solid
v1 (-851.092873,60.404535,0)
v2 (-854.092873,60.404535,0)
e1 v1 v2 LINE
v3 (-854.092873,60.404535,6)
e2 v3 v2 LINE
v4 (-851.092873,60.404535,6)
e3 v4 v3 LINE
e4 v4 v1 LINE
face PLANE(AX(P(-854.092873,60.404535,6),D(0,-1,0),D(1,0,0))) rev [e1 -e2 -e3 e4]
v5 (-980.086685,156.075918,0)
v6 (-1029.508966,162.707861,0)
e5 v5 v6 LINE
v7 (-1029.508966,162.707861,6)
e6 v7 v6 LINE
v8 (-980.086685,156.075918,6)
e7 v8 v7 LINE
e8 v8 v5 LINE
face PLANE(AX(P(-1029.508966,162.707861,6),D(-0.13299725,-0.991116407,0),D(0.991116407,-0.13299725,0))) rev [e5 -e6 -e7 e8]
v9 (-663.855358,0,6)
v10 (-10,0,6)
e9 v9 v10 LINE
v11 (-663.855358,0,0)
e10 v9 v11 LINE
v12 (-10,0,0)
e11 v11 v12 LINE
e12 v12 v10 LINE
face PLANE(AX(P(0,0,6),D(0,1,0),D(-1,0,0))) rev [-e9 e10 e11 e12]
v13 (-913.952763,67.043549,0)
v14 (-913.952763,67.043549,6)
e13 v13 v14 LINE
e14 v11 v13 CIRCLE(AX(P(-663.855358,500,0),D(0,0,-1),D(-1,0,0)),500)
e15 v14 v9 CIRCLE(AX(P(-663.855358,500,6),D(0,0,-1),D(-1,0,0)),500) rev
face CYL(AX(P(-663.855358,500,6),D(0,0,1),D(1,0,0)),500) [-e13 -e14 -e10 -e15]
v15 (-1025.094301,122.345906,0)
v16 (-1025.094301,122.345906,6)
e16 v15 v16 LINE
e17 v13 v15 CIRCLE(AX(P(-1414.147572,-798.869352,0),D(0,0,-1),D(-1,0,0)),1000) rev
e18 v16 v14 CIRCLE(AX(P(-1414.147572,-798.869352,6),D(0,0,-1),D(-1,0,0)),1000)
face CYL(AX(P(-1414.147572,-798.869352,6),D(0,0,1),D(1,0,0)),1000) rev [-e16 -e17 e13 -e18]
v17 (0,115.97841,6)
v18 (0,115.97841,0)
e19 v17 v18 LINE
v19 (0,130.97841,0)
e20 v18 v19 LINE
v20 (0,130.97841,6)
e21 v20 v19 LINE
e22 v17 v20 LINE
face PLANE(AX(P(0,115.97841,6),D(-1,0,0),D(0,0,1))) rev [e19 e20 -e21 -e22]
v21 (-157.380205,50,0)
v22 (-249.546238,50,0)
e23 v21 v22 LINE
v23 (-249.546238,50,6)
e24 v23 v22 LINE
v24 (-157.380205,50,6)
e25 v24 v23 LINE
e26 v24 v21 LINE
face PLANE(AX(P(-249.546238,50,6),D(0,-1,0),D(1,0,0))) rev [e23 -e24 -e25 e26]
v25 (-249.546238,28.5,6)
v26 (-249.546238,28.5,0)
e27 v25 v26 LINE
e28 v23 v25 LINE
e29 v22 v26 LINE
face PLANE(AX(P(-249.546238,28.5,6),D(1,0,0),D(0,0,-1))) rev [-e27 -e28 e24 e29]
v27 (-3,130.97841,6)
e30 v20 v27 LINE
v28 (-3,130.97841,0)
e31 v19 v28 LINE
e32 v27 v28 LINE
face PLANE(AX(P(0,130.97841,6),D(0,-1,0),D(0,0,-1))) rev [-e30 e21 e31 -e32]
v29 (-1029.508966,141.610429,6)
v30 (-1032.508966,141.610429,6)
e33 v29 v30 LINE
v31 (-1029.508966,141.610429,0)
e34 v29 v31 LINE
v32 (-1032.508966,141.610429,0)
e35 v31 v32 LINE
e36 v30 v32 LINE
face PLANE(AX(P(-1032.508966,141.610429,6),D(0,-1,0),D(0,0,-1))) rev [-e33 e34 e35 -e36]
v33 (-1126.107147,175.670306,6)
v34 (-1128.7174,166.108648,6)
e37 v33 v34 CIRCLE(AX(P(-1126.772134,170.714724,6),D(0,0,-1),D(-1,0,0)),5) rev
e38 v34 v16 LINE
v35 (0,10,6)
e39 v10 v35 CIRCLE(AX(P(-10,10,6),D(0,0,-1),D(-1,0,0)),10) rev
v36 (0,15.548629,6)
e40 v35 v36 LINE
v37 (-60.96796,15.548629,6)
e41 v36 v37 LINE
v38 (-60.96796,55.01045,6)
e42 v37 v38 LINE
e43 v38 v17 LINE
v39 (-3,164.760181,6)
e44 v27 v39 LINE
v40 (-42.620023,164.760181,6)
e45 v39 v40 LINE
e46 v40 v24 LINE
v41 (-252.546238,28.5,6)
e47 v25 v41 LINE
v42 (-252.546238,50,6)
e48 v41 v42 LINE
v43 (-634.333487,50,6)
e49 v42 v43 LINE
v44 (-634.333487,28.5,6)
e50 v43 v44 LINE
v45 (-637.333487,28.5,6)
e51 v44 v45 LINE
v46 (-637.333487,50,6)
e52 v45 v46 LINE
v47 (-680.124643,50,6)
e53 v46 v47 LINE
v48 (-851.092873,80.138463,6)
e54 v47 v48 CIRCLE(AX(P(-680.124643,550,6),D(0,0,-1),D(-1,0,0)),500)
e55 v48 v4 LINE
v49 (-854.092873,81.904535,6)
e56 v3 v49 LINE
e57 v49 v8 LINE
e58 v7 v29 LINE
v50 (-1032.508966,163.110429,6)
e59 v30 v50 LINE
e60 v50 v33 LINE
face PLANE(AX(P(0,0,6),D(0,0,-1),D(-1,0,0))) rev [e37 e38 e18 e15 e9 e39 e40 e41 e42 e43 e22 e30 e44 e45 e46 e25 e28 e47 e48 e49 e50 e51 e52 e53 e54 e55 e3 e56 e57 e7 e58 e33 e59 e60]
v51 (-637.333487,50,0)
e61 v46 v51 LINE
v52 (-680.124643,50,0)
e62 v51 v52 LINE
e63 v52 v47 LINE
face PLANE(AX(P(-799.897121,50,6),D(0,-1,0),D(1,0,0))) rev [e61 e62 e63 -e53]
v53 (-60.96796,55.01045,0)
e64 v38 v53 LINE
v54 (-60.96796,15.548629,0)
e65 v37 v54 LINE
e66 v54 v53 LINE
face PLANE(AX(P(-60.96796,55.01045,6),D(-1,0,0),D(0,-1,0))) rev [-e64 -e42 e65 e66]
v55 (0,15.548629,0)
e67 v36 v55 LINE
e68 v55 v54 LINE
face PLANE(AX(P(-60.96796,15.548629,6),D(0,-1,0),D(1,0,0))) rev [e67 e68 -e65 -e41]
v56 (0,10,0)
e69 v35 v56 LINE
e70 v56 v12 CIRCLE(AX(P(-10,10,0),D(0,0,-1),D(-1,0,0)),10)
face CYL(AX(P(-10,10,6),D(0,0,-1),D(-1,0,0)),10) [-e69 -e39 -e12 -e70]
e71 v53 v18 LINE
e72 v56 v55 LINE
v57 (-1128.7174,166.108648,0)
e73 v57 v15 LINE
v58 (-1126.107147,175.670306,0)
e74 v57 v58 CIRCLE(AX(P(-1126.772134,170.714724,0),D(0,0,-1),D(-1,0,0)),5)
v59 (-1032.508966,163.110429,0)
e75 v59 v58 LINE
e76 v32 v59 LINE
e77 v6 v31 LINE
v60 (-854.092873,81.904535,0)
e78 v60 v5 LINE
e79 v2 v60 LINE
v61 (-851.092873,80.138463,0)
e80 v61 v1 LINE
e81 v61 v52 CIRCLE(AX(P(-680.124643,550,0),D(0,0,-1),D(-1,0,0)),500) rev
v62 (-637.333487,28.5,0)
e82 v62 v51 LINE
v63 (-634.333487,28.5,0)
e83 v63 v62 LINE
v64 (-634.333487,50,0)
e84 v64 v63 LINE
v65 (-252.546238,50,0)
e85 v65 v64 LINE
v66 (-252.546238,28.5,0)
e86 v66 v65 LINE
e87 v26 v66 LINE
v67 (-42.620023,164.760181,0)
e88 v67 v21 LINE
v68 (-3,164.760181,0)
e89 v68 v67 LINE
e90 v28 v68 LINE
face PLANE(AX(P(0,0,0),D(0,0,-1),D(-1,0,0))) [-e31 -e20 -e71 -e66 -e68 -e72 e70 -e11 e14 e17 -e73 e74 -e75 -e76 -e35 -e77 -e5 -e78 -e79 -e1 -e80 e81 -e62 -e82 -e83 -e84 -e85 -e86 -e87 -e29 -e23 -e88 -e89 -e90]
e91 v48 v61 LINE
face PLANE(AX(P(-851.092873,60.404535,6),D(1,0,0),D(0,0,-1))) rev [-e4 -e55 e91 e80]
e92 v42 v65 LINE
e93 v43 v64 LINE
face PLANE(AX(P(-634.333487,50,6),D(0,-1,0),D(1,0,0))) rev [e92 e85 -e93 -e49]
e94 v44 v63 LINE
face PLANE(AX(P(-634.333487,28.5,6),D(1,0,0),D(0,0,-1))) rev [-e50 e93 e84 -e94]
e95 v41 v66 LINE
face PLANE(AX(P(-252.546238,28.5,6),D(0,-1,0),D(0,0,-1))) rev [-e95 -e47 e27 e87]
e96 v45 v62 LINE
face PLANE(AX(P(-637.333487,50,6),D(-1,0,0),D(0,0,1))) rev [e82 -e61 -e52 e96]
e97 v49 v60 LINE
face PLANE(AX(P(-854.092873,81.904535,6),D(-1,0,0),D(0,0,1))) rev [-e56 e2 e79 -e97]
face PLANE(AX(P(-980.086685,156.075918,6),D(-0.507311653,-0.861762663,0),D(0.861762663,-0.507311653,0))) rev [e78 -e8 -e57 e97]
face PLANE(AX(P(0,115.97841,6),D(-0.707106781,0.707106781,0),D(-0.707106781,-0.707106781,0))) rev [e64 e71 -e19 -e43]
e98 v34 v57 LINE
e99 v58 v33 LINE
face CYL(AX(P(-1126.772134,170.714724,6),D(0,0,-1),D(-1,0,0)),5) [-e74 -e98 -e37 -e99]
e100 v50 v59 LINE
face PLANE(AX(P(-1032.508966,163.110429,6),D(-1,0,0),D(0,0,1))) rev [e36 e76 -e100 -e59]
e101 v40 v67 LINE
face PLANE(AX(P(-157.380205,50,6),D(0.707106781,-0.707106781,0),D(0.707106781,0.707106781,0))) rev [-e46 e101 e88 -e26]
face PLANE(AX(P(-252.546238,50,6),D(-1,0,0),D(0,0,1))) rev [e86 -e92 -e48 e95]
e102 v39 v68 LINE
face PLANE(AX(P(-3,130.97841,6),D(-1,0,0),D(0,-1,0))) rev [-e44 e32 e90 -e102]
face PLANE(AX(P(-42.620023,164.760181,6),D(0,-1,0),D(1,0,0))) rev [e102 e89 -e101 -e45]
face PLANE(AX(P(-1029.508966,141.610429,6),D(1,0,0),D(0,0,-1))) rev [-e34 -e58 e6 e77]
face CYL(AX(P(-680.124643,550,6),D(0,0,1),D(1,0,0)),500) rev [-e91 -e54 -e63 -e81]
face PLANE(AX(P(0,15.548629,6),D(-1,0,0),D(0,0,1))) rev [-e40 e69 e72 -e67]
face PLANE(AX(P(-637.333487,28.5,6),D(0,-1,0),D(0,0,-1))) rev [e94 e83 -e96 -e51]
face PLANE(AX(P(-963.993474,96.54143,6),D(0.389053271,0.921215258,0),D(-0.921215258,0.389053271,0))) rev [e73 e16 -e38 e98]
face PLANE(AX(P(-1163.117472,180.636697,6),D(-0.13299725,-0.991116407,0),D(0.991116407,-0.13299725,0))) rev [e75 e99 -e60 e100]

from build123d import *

# Parameters (mm, degrees)
BOSS_EXTRU_1_DEPTH = 6
CONG_1_R           = 1000
CONG_2_R           = 500
CONG_4_R           = 10
CONG_5_R           = 5
CONG_6_R           = 500


with BuildPart() as part:
    # Esquisse2 → Boss.-Extru.1 (new body)
    with BuildSketch(Plane.XY):
        Polygon((0, 0), (-800, 0), (-963.993473565, 96.541430402), (-1163.117471936, 180.636697165), (-1032.508966499, 163.110428865), (-1032.508966499, 141.610428865), (-1029.508966499, 141.610428865), (-1029.508966499, 162.707860864), (-980.08668451, 156.075917781), (-854.092873153, 81.904534581), (-854.092873153, 60.404534581), (-851.092873153, 60.404534581), (-851.092873153, 80.138462524), (-799.897120857, 50), (-637.333486788, 50), (-637.333486788, 28.5), (-634.333486788, 28.5), (-634.333486788, 50), (-252.546237876, 50), (-252.546237876, 28.5), (-249.546237876, 28.5), (-249.546237876, 50), (-157.380204695, 50), (-42.620023216, 164.760181479), (-3, 164.760181479), (-3, 130.978409526), (0, 130.978409526), (0, 115.978409526), (-60.96795982, 55.010449706), (-60.96795982, 15.54862942), (0, 15.54862942), align=None)
    extrude(amount=BOSS_EXTRU_1_DEPTH)

    # Congé1
    cong_1_edges = [part.edges().sort_by_distance(p)[0] for p in [
        (-963.993473565, 96.541430402, 3),
    ]]
    fillet(cong_1_edges, radius=CONG_1_R)

    # Congé2
    cong_2_edges = [part.edges().sort_by_distance(p)[0] for p in [
        (-800, 0, 3),
    ]]
    fillet(cong_2_edges, radius=CONG_2_R)

    # Congé4
    cong_4_edges = [part.edges().sort_by_distance(p)[0] for p in [
        (0, 0, 3),
    ]]
    fillet(cong_4_edges, radius=CONG_4_R)

    # Congé5
    cong_5_edges = [part.edges().sort_by_distance(p)[0] for p in [
        (-1163.117471936, 180.636697165, 3),
    ]]
    fillet(cong_5_edges, radius=CONG_5_R)

    # Congé6
    # the kernel refuses this fillet: 500 mm, written as the material it adds along each edge
    with BuildSketch(Plane(origin=(-799.897120857, 50, 0), x_dir=(-0.8617626627439038, 0.5073116528333809, 0), z_dir=(0, 0, 1))) as cong_6_piece_1_section:
        with BuildLine():
            CenterArc((150.440377281, -491.643304898), CONG_6_R, 100.490027974, 19.994897644)
            Line((-103.215449136, -60.761973526), (-108.288565664, -52.144346898))
            Line((-108.288565664, -52.144346898), (-5.073116528, 8.617626627))
            Line((-5.073116528, 8.617626627), (0, 10))
            ThreePointArc((0, 10), (29.704090529, 10), (57.587537133, 9.832866098))
            Line((57.587537133, 9.832866098), (59.408181057, 0))
        make_face()
    cong_6_piece_1 = extrude(amount=6, mode=Mode.PRIVATE)
    cong_6_piece_1 = split(cong_6_piece_1, bisect_by=Plane(origin=(-851.092873153, 52.596718386, 3), z_dir=(1, 0, 0)), keep=Keep.TOP, mode=Mode.PRIVATE)
    add(cong_6_piece_1)


solid = part.part
